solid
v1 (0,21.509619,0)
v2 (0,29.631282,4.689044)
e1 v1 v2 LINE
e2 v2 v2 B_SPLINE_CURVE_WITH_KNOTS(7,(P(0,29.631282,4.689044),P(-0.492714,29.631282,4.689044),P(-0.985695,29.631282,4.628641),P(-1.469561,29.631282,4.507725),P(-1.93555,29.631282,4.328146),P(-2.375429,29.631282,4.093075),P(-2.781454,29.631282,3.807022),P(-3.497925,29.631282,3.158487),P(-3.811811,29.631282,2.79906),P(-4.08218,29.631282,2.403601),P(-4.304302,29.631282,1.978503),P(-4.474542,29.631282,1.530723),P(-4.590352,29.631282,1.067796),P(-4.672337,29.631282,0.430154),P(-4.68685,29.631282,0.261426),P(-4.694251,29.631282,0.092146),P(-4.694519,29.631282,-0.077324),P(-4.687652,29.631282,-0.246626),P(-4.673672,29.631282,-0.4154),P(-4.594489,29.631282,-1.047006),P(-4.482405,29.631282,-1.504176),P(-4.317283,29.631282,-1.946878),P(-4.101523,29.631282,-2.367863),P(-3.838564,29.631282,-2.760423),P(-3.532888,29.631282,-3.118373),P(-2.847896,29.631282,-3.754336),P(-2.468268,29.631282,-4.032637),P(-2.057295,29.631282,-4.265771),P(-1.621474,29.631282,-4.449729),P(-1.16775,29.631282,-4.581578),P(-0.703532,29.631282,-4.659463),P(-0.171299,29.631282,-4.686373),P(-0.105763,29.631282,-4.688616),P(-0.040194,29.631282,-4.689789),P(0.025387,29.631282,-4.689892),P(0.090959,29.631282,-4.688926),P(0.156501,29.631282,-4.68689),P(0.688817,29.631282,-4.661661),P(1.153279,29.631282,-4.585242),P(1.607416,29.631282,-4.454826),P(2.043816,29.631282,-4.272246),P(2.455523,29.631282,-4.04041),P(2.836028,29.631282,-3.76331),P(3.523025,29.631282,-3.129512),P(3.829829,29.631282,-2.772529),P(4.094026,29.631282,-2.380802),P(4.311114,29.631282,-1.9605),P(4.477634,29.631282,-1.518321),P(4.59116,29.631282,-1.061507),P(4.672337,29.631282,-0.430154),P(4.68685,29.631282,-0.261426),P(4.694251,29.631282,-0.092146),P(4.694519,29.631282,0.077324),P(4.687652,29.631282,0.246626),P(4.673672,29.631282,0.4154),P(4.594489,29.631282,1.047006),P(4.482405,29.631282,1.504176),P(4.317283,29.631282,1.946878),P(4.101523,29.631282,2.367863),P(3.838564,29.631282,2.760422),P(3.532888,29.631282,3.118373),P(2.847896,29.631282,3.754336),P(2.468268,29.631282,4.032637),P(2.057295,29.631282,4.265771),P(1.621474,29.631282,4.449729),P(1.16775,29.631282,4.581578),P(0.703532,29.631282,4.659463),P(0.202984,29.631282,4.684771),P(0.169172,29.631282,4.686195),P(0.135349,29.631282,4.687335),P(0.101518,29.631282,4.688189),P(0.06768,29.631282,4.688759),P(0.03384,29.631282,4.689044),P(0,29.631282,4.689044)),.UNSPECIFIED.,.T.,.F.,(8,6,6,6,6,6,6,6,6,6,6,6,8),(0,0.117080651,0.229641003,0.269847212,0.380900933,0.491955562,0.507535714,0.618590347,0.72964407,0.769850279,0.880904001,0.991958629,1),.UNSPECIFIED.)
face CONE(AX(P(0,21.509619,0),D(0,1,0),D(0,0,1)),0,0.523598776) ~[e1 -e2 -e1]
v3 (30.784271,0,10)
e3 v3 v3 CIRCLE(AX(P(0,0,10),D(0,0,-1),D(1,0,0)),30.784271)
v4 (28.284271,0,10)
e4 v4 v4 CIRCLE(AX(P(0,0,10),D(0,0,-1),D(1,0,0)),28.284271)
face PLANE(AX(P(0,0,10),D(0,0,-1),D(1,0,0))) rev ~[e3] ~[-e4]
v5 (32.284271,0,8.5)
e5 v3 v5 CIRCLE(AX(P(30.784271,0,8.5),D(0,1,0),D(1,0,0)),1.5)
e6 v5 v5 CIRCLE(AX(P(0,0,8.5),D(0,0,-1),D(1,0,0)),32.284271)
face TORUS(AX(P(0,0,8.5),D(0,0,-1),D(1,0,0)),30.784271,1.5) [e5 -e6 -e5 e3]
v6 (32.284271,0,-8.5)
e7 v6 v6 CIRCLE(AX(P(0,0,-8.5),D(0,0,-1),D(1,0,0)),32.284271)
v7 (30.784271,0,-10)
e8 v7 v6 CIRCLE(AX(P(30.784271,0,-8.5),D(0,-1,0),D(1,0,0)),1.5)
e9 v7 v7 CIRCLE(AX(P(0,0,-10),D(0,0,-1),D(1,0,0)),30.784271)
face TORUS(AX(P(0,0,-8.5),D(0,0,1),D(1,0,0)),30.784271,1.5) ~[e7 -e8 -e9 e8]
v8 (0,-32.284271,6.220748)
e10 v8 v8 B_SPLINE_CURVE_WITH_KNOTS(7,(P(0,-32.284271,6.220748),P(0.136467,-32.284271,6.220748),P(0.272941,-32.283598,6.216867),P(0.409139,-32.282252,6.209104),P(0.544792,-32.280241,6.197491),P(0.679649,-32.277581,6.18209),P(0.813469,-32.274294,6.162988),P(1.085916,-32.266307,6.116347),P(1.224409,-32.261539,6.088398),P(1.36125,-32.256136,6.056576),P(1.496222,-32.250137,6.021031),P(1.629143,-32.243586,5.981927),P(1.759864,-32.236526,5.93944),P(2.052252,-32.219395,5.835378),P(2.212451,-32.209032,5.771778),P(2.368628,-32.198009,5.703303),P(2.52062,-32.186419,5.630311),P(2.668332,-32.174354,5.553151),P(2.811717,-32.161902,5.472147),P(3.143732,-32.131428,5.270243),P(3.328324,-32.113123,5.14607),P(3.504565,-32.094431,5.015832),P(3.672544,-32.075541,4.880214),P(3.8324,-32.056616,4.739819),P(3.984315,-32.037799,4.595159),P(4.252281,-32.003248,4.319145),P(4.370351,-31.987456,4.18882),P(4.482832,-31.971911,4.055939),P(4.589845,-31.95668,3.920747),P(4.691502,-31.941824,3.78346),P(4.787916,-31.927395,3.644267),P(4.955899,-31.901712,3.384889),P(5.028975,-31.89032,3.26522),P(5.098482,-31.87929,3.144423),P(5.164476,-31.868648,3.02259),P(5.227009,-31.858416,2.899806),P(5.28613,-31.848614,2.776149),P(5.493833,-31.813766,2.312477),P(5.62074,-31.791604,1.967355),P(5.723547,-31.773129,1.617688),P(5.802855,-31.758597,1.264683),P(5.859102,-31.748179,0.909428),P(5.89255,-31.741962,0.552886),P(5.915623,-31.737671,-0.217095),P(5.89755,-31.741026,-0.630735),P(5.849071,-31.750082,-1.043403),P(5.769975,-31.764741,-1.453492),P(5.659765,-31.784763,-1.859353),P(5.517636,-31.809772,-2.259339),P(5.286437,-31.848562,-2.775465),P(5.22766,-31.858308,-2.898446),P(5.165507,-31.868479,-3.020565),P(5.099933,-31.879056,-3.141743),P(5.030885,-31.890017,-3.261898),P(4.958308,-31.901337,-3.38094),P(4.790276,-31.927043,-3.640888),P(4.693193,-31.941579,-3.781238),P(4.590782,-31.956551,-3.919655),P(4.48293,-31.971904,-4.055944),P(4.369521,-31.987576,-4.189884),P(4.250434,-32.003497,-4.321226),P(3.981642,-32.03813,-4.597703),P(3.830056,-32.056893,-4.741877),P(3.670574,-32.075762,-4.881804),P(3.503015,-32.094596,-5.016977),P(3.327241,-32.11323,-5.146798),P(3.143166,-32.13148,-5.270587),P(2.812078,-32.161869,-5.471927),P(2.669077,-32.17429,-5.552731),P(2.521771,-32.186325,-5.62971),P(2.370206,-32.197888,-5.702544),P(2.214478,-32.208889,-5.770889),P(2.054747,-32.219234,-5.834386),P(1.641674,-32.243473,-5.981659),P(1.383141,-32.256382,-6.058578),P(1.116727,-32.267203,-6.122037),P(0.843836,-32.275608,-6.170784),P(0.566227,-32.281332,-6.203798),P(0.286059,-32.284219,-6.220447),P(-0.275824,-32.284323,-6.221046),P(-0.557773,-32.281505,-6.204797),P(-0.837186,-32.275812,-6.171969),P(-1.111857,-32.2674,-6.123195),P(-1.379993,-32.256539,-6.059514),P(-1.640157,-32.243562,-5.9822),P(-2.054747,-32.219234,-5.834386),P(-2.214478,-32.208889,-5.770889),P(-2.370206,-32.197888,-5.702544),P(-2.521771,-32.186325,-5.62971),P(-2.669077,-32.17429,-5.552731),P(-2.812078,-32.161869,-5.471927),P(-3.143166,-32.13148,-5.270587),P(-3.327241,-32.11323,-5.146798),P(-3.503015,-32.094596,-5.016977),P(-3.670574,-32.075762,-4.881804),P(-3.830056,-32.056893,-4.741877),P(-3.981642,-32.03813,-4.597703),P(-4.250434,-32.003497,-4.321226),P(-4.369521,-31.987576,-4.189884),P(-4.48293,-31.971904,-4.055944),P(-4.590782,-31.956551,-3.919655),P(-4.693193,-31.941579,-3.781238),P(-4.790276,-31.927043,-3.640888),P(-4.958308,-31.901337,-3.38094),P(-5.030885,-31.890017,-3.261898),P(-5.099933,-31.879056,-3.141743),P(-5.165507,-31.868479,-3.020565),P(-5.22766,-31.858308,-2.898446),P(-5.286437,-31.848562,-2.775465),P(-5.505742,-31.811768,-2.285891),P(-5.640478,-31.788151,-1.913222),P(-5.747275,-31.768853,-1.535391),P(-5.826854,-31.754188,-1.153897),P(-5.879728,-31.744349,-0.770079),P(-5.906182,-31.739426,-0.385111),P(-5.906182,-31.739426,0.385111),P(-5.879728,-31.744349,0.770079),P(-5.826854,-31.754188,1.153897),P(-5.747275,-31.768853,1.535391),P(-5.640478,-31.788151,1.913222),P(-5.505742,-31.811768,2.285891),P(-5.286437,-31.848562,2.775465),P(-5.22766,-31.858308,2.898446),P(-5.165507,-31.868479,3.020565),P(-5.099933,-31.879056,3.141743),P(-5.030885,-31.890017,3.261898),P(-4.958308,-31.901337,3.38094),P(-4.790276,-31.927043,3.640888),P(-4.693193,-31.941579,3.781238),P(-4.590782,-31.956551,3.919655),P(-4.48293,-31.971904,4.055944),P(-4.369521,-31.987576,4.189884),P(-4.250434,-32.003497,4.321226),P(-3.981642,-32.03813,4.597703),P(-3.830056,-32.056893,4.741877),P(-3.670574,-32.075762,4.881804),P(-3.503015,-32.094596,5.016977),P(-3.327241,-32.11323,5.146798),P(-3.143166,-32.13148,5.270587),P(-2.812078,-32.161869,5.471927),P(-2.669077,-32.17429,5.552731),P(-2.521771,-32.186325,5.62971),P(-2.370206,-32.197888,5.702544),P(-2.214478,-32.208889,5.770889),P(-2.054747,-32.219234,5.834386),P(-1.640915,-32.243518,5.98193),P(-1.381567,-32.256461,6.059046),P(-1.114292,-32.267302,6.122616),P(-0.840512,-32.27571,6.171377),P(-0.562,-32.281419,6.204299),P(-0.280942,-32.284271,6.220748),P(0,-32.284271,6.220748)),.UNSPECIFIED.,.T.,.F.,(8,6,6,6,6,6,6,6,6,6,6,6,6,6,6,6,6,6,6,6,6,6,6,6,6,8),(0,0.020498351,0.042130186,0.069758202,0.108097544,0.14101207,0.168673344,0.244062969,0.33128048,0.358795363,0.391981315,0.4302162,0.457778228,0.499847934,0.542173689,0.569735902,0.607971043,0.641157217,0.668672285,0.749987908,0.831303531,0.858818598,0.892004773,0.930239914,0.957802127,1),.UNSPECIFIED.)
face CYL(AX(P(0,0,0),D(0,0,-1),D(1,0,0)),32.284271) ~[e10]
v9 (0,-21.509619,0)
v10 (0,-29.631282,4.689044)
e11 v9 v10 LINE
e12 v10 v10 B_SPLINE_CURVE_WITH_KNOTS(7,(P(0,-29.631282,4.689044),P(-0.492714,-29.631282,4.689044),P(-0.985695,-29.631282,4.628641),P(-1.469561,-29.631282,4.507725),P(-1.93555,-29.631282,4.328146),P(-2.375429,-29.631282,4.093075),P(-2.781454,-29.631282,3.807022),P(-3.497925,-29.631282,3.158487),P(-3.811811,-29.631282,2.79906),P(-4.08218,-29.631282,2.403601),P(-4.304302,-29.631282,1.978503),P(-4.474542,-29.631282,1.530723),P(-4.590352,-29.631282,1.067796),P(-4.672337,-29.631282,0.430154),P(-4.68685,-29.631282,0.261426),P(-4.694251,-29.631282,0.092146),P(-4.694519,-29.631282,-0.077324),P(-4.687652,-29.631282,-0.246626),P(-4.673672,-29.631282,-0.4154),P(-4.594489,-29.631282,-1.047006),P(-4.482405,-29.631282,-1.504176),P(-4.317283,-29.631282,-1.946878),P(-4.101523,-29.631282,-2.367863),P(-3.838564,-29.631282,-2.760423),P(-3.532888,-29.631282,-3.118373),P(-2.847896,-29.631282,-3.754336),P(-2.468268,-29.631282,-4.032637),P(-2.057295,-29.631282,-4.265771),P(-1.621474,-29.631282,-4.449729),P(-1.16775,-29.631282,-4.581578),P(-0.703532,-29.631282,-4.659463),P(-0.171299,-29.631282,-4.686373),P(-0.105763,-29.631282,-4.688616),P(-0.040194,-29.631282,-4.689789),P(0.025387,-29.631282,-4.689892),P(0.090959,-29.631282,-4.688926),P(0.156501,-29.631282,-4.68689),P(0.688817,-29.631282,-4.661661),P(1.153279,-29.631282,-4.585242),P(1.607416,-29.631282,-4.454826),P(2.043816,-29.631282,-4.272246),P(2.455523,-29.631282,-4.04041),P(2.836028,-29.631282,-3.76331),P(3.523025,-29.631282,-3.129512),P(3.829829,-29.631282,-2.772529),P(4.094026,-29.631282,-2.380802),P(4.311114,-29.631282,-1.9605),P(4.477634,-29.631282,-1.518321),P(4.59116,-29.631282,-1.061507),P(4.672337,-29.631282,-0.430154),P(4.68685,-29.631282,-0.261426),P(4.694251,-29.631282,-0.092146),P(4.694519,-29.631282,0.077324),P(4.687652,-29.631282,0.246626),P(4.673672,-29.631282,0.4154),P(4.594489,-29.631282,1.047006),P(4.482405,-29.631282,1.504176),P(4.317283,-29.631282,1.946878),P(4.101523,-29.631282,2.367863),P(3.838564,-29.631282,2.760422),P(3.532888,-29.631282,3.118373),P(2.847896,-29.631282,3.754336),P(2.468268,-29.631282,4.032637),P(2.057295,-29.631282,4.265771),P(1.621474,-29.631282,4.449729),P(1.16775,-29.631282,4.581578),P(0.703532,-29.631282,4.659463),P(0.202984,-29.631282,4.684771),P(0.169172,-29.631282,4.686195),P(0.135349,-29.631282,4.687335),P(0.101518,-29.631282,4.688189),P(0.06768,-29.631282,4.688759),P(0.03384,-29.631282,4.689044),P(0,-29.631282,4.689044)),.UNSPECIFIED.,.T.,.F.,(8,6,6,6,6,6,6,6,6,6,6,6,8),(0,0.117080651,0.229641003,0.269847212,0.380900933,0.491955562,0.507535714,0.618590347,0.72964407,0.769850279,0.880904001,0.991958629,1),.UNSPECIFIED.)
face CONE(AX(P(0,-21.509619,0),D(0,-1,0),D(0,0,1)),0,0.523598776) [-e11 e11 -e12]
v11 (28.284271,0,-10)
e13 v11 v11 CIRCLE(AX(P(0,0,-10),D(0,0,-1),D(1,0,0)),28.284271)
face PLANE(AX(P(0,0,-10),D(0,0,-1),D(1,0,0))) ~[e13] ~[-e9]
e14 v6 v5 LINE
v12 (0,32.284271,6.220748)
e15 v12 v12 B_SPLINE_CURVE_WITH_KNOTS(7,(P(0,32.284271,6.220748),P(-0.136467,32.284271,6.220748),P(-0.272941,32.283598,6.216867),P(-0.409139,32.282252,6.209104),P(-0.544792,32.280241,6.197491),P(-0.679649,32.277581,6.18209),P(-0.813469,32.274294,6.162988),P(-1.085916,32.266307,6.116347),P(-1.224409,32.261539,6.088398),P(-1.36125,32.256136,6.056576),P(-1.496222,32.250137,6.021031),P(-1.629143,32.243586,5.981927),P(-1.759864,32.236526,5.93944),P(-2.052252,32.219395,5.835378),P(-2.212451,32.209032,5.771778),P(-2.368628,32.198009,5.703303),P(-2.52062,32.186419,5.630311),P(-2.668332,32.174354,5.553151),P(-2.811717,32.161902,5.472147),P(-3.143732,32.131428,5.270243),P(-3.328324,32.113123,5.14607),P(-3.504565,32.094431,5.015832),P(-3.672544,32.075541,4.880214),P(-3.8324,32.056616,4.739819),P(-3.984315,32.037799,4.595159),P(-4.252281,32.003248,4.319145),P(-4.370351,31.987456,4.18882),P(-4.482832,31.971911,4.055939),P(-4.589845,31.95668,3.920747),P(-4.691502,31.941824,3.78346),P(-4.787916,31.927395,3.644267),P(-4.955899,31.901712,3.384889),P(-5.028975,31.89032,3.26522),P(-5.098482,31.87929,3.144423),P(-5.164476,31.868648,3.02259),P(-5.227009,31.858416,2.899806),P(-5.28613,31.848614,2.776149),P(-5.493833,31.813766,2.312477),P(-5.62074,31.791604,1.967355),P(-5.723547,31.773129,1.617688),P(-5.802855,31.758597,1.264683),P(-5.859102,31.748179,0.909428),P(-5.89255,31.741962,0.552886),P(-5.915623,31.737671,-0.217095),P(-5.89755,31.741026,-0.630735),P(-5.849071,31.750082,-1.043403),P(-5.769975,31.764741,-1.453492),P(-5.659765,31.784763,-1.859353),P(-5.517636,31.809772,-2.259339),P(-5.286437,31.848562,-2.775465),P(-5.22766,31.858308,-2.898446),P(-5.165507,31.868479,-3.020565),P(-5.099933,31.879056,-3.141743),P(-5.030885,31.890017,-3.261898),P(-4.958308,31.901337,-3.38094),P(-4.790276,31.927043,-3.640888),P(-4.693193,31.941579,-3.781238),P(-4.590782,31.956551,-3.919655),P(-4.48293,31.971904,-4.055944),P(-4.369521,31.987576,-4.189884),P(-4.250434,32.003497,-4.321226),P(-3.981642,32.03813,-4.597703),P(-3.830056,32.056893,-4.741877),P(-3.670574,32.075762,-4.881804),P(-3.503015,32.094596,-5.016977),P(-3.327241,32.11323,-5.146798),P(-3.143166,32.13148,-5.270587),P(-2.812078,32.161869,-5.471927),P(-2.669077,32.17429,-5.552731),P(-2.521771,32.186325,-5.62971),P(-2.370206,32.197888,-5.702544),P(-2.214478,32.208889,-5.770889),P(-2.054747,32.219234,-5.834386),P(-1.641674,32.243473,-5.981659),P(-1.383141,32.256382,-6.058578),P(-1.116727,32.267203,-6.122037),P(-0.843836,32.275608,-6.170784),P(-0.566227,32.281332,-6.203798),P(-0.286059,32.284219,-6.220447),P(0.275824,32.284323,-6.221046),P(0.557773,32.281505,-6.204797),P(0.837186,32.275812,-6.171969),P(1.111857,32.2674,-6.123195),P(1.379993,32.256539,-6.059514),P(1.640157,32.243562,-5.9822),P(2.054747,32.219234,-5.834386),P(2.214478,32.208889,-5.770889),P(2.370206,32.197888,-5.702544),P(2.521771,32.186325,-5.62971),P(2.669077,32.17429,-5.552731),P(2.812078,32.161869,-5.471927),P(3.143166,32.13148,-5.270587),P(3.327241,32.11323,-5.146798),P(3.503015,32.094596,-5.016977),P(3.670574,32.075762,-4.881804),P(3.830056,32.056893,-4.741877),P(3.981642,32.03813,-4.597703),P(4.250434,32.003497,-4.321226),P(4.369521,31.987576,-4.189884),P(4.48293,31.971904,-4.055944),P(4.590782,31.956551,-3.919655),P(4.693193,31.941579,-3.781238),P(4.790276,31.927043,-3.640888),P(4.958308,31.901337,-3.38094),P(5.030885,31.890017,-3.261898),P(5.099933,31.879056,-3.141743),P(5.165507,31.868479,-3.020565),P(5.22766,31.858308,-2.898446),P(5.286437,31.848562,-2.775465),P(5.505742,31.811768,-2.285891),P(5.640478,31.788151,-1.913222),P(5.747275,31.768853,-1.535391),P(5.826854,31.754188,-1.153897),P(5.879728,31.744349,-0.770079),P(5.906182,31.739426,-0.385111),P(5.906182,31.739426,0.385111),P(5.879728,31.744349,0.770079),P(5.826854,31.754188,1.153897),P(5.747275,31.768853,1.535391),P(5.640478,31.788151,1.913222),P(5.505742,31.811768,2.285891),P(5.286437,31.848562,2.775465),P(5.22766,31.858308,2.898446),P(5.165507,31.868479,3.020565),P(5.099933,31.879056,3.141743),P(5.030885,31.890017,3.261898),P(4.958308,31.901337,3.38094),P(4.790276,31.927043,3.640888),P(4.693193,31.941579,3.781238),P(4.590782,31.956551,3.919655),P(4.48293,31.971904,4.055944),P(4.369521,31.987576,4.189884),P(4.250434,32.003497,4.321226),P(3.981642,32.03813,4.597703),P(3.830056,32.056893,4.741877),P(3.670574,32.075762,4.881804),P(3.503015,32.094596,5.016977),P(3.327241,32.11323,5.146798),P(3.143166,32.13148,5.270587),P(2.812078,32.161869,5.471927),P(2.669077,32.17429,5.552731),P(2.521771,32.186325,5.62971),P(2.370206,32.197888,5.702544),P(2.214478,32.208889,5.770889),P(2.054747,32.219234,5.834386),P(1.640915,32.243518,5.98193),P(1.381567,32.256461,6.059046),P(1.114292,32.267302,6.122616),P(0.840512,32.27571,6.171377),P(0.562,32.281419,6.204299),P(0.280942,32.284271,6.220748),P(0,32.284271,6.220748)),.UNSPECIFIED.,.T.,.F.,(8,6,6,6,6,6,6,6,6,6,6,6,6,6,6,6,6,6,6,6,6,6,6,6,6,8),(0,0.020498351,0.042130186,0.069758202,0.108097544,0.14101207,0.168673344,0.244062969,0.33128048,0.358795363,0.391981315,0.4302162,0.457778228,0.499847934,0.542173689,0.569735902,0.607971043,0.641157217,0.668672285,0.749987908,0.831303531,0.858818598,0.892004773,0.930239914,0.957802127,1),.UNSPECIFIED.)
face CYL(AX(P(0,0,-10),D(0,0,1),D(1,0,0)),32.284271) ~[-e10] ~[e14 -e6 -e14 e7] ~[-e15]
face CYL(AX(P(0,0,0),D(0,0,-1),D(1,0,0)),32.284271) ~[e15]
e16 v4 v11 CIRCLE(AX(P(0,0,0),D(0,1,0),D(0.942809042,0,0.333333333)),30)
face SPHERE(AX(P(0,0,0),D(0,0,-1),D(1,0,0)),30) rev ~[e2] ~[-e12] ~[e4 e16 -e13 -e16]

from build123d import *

# Parameters (mm, degrees)
F4_R     = 37.2842712475
F4_R_2   = 32.2842712475
F5_DEPTH = 12.5
F6_R     = 1.5


# Not quite as in the source:
# - a pattern or mirror of a feature is missing from the dataset's text; its kind, count and spacing are read off the source's solid


with BuildPart() as f1:
    # F0 (on Front) → F1 (revolve)
    with BuildSketch(Plane.XZ):
        with BuildLine():
            Line((32.2842712475, 10), (28.2842712475, 10))
            ThreePointArc((28.2842712475, 10), (30, 0), (28.2842712475, -10))
            Line((28.2842712475, -10), (32.2842712475, -10))
            Line((32.2842712475, -10), (32.2842712475, 10))
        make_face()
    revolve(axis=Axis((0, 0, -0.0082536135), (0, 0, -1)))

    # F2 (on Right) → F3 (revolve)
    with BuildSketch(Plane.YZ):
        Polygon((-21.5096189432, 0), (-34.5, 7.5), (-34.5, 0), align=None)
    f3 = revolve(axis=Axis((0, -28.0048094716, 0), (0, -1, 0)))

    # F3_copies: F3 across plane
    add(f3.mirror(Plane.ZX))

    # F4 (on Top) → F5 (cut, symmetric)
    with BuildSketch(Plane.XY):
        Circle(F4_R)
        Circle(F4_R_2, mode=Mode.SUBTRACT)
    extrude(amount=F5_DEPTH, both=True, mode=Mode.SUBTRACT)

    # F6
    f6_edges = [f1.edges().sort_by_distance(p)[0] for p in [
        (-32.284271, 0, 10),
        (-32.284271, 0, -10),
    ]]
    fillet(f6_edges, radius=F6_R)


solid = f1.part
